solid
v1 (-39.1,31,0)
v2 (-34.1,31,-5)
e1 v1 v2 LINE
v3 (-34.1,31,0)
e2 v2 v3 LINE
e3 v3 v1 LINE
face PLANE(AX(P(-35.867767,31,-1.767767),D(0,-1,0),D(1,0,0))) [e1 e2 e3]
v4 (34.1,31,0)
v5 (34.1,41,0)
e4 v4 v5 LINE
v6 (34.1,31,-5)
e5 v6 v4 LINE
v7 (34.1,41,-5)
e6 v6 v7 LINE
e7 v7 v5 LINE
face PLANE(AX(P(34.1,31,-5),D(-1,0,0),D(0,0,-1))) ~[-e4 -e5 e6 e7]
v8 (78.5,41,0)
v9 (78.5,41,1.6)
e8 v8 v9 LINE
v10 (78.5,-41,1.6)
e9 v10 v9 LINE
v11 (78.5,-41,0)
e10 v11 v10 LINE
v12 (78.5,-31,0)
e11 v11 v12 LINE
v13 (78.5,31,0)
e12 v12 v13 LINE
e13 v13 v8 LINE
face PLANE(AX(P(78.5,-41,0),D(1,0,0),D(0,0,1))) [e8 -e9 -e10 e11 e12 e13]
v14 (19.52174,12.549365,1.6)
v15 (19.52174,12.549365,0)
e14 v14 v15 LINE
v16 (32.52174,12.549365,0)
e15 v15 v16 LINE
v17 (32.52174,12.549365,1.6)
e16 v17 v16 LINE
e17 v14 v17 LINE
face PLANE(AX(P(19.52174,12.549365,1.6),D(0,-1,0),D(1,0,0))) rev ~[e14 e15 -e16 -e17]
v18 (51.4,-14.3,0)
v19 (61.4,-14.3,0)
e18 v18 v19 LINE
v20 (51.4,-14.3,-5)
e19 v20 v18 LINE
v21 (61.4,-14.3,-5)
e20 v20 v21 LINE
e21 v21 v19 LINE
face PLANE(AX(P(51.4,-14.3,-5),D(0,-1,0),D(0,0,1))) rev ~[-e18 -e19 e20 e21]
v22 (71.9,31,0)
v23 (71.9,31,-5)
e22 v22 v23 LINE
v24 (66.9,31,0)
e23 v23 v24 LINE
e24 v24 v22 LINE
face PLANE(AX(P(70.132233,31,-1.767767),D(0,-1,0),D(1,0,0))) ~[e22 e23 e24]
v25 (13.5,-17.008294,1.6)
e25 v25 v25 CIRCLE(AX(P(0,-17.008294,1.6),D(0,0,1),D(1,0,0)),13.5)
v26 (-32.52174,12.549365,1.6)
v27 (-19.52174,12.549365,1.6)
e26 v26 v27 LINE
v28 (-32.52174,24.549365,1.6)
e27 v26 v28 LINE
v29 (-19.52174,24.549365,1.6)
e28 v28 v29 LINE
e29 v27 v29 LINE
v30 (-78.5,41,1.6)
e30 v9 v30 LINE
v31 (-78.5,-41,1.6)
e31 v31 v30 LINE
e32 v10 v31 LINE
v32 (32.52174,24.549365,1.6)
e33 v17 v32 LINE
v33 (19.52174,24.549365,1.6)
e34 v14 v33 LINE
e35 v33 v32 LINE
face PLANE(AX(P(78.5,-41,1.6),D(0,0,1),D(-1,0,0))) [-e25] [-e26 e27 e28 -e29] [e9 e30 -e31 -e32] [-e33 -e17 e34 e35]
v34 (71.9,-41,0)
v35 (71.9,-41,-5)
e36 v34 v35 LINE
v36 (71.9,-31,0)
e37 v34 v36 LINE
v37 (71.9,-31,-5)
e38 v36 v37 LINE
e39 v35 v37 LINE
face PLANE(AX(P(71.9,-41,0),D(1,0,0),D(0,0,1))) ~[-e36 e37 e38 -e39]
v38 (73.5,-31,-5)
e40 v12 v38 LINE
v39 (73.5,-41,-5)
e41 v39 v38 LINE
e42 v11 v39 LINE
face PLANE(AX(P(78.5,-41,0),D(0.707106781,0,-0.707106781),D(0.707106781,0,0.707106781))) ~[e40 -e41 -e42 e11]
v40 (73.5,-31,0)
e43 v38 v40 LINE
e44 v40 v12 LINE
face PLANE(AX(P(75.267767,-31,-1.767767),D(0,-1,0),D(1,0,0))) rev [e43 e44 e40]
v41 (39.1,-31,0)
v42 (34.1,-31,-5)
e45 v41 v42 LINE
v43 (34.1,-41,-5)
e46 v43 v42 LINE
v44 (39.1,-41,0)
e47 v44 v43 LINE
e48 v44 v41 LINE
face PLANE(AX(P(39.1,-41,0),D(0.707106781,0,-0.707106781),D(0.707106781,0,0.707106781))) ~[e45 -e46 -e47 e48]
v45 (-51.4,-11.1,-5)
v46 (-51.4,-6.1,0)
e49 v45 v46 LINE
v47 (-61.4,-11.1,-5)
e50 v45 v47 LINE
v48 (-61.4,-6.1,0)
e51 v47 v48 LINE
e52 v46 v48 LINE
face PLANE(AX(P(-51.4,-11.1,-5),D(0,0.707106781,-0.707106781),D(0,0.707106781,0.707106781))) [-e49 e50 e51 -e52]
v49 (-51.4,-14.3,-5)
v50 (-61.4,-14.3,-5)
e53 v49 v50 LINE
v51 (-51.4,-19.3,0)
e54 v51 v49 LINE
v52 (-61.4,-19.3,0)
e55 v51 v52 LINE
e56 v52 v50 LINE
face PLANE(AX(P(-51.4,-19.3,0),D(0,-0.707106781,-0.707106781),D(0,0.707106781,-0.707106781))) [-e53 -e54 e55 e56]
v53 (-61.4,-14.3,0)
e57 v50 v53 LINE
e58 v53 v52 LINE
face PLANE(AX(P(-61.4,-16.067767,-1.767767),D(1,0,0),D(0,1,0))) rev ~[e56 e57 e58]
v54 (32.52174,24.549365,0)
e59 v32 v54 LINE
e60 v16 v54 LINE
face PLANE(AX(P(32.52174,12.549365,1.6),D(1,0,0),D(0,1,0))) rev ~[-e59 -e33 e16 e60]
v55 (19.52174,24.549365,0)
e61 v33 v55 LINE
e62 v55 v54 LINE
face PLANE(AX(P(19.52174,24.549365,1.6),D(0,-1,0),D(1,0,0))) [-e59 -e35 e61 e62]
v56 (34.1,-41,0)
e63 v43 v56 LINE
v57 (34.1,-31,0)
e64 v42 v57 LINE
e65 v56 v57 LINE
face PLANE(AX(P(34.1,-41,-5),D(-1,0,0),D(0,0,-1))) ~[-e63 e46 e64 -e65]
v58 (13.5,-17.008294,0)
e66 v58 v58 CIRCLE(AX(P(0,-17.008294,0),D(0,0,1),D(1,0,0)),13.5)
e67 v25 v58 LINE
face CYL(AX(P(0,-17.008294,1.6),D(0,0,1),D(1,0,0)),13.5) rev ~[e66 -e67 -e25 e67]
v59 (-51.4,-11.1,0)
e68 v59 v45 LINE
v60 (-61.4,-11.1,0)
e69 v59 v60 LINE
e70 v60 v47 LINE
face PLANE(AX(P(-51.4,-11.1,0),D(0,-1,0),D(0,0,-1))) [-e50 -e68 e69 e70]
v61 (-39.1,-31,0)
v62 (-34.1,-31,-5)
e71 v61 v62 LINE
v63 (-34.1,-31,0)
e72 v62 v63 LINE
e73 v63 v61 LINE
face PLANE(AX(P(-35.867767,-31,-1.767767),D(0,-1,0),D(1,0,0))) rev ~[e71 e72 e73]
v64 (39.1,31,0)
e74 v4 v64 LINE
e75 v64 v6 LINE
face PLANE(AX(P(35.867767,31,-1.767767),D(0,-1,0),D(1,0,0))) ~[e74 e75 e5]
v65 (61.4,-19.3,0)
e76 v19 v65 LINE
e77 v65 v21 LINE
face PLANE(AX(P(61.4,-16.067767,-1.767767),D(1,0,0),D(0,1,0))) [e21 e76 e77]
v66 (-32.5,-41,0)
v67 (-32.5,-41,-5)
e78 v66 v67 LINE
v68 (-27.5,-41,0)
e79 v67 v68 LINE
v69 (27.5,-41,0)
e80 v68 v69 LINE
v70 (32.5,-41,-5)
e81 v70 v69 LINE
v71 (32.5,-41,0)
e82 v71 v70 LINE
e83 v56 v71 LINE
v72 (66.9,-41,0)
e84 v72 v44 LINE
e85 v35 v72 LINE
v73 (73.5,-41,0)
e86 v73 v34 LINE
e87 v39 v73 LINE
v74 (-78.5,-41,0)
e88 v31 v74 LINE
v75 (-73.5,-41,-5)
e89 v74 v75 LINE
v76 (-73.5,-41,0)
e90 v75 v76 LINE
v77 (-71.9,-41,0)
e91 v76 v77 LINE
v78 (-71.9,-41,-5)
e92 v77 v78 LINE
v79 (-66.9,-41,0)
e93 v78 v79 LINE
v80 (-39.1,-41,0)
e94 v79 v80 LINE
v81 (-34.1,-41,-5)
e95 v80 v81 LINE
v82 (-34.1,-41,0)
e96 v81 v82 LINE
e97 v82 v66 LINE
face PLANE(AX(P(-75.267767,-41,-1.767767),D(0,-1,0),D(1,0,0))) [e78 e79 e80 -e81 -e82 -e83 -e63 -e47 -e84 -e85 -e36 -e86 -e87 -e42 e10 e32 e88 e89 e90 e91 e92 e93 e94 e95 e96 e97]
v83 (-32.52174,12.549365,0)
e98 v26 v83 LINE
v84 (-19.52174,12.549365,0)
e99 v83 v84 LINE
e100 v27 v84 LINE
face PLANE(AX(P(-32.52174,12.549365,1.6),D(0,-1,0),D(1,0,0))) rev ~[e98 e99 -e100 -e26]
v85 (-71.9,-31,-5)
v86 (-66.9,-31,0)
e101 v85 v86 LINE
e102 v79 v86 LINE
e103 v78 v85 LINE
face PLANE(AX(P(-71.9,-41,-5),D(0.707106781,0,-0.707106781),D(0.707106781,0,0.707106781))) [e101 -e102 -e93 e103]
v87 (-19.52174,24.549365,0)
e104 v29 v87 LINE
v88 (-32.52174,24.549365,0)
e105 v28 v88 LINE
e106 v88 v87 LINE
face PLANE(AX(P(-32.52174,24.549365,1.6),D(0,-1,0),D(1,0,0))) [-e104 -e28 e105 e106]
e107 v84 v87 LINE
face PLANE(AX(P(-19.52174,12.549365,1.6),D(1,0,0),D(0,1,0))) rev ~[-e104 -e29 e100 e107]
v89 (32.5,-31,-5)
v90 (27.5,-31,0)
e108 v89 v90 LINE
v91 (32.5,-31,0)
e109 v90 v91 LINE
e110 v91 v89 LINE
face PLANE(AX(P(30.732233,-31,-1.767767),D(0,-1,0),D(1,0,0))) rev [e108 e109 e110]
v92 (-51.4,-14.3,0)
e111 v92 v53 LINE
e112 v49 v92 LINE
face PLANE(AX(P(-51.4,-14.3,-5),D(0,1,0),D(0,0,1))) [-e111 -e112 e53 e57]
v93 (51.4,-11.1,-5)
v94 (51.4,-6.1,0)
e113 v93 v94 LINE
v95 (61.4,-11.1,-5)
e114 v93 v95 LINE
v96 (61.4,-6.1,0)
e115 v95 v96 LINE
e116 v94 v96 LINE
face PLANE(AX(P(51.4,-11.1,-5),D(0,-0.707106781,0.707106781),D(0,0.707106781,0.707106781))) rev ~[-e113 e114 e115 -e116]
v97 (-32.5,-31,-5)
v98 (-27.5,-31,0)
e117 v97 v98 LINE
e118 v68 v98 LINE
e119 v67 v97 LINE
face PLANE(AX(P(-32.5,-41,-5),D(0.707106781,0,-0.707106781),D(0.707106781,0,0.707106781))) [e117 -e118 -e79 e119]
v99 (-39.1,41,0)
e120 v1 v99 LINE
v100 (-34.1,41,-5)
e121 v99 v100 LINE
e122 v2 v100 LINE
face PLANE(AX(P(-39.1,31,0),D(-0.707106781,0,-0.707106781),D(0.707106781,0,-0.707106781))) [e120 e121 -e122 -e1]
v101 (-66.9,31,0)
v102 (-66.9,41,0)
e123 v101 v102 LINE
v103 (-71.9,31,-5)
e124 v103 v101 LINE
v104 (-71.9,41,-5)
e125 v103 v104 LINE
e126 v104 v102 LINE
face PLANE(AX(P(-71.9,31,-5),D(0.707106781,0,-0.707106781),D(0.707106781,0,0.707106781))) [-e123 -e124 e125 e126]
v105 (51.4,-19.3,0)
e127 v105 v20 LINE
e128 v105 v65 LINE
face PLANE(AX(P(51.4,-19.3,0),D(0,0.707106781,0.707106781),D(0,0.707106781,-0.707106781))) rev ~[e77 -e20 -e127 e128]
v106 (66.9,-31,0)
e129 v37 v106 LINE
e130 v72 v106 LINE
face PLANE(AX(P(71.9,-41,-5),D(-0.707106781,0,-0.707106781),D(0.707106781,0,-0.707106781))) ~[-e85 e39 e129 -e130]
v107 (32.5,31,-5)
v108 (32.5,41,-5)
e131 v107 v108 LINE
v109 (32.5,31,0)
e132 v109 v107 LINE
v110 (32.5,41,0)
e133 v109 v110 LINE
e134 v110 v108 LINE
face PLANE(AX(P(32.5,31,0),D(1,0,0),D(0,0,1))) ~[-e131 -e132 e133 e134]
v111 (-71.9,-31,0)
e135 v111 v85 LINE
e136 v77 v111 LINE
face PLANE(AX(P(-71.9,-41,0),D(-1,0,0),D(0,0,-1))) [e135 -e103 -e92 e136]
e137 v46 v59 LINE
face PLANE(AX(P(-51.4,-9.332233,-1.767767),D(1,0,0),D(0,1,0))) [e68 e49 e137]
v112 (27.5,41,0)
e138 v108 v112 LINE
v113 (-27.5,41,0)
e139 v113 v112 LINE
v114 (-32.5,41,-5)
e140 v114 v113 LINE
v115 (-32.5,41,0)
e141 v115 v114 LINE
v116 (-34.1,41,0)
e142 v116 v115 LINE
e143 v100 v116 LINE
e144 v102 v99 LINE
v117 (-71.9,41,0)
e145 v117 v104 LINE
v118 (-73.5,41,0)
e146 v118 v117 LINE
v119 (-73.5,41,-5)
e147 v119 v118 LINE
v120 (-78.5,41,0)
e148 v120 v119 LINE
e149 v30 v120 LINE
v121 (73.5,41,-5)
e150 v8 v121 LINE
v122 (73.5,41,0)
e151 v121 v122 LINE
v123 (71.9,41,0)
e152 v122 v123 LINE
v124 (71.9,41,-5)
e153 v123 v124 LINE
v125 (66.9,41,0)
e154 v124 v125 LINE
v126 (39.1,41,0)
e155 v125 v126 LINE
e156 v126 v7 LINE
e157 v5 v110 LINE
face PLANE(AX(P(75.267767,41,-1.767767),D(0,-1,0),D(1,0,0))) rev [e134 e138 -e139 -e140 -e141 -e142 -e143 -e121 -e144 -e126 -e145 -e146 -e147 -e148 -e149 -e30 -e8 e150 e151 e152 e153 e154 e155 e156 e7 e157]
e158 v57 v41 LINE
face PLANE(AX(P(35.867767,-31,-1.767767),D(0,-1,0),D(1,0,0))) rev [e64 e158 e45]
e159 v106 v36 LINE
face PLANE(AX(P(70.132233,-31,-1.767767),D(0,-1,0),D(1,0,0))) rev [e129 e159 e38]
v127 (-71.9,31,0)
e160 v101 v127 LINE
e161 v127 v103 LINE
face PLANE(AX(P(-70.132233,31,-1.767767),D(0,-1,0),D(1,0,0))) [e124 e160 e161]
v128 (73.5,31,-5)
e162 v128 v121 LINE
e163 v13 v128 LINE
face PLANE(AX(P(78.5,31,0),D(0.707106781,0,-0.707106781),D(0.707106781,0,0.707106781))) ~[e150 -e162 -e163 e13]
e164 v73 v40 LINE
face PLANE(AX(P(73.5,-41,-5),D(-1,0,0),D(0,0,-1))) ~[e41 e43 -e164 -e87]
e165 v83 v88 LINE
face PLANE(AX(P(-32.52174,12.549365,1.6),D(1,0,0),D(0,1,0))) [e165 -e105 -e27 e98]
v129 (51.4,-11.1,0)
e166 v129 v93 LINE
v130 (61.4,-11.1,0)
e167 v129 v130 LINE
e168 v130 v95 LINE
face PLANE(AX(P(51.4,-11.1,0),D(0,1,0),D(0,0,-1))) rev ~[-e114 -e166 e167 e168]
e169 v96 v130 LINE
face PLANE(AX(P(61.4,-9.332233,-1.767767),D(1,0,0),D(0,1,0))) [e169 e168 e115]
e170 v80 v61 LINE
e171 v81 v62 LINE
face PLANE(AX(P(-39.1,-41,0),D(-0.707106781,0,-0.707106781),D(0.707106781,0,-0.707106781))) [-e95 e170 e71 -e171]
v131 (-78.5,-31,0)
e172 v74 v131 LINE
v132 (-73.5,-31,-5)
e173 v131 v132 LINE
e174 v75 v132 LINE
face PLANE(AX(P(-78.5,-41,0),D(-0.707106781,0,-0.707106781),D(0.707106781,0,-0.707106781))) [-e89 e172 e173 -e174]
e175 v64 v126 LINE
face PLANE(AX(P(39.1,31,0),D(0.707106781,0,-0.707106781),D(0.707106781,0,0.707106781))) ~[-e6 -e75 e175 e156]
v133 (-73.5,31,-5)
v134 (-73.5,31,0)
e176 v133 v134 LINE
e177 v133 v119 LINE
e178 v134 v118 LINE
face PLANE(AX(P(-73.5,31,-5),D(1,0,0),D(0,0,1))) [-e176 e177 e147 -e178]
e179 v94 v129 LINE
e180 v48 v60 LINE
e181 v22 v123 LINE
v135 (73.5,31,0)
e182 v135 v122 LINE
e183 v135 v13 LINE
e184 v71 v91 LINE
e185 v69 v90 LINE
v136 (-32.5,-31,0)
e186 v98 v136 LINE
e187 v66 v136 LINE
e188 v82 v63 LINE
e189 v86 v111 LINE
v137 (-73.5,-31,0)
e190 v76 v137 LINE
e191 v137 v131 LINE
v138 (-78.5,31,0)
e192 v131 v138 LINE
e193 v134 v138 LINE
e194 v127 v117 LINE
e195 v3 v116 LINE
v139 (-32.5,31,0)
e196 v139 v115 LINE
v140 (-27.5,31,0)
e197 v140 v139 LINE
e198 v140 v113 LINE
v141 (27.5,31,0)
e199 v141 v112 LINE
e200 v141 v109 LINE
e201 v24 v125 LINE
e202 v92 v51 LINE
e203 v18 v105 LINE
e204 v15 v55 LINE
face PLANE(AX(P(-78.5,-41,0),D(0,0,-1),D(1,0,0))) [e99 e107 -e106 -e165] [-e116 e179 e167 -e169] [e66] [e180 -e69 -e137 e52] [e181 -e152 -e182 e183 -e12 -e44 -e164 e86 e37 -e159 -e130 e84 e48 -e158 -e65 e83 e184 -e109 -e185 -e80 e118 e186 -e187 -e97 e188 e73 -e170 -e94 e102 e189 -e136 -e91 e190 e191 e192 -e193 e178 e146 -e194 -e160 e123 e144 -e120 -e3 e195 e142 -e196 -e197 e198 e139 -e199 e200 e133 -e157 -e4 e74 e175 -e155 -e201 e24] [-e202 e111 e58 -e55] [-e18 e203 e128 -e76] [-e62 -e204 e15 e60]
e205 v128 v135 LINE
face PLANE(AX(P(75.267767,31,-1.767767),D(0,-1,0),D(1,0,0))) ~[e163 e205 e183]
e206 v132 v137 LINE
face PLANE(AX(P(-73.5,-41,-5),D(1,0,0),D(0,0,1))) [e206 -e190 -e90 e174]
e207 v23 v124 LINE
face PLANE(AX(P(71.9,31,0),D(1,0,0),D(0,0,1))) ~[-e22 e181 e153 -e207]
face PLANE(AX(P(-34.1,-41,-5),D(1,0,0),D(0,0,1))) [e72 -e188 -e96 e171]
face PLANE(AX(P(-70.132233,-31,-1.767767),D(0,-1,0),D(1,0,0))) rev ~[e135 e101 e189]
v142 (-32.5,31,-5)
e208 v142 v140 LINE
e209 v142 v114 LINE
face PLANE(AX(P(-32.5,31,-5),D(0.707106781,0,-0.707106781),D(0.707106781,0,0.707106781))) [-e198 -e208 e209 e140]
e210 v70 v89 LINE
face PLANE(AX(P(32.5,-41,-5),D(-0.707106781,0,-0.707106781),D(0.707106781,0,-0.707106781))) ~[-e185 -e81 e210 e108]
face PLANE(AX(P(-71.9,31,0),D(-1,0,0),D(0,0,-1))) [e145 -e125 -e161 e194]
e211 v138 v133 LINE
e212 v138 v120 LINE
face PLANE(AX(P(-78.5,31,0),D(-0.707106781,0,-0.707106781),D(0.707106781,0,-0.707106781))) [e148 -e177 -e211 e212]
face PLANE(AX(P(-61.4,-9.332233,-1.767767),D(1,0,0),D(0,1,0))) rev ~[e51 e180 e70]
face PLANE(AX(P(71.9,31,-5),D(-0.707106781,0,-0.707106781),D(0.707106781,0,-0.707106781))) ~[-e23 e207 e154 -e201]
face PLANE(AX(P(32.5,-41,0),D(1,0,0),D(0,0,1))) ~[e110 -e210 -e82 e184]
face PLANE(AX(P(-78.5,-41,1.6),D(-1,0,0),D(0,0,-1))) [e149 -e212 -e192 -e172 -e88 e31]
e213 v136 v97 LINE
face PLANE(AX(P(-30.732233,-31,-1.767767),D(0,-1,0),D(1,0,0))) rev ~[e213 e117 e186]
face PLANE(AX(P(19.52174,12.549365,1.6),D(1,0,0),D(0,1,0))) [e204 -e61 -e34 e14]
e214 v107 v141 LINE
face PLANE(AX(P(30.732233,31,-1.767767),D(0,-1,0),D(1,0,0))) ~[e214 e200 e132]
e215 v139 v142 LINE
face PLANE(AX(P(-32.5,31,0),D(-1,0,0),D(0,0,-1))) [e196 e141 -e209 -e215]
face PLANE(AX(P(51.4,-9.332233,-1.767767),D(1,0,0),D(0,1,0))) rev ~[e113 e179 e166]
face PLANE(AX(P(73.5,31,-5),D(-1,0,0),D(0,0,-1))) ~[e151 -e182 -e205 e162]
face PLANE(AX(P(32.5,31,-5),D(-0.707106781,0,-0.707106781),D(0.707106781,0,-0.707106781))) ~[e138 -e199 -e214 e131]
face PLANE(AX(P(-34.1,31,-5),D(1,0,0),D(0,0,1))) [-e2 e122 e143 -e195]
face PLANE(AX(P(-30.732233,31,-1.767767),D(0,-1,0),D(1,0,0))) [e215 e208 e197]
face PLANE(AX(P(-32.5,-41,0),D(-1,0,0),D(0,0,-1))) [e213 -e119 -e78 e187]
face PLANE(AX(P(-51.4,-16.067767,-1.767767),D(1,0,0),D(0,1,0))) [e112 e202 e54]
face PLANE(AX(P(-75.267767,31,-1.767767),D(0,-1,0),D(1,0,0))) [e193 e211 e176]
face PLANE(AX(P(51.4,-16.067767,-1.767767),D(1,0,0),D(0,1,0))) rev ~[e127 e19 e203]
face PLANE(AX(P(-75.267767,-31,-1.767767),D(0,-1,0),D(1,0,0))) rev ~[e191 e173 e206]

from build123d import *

# Parameters (mm, degrees)
F2_DEPTH  = 82
F3_DEPTH  = 10
F4_START  = -72
F4_DEPTH  = 10
F7_DEPTH  = 10
F8_START  = 102.8
F8_DEPTH  = 10
F10_R     = 13.5
F11_DEPTH = 1.6
F12_W     = 13
F12_H     = 12
F13_DEPTH = 1.6


# Not quite as in the source:
# - a feature names something its author has since deleted; it is built from what else it names


with BuildPart() as f2:
    # F1 (on offset) → F2 (new body)
    with BuildSketch(Plane.XZ.offset(41)):
        Polygon((78.5, 0), (78.5, 1.6), (-78.5, 1.6), (-78.5, 0), (-73.5, 0), (-71.9, 0), (-66.9, 0), (-39.1, 0), (-34.1, 0), (-32.5, 0), (-27.5, 0), (27.5, 0), (32.5, 0), (34.1, 0), (39.1, 0), (66.9, 0), (71.9, 0), (73.5, 0), align=None)
    extrude(amount=-F2_DEPTH)

    # F1 (on offset) → F3 (join)
    with BuildSketch(Plane.XZ.offset(41)):
        Polygon((-66.9, 0), (-71.9, 0), (-71.9, -5), align=None)
        Polygon((-34.1, 0), (-39.1, 0), (-34.1, -5), align=None)
        Polygon((-27.5, 0), (-32.5, 0), (-32.5, -5), align=None)
        Polygon((-73.5, 0), (-78.5, 0), (-73.5, -5), align=None)
    extrude(amount=-F3_DEPTH)

    # F1 (on offset) → F4 (join)
    with BuildSketch(Plane.XZ.offset(41).offset(F4_START)):
        Polygon((-66.9, 0), (-71.9, 0), (-71.9, -5), align=None)
        Polygon((-34.1, 0), (-39.1, 0), (-34.1, -5), align=None)
        Polygon((-27.5, 0), (-32.5, 0), (-32.5, -5), align=None)
        Polygon((-73.5, 0), (-78.5, 0), (-73.5, -5), align=None)
    extrude(amount=-F4_DEPTH)

    # F6 (on offset) → F7 (join)
    with BuildSketch(Plane.YZ.offset(-51.4)):
        Polygon((-11.1, 0), (-11.1, -5), (-6.1, 0), align=None)
        Polygon((-14.3, -5), (-14.3, 0), (-19.3, 0), align=None)
    extrude(amount=-F7_DEPTH)

    # F6 (on offset) → F8 (join)
    with BuildSketch(Plane.YZ.offset(-51.4).offset(F8_START)):
        Polygon((-11.1, 0), (-11.1, -5), (-6.1, 0), align=None)
        Polygon((-14.3, -5), (-14.3, 0), (-19.3, 0), align=None)
    extrude(amount=F8_DEPTH)

    # F9: F2 across plane


with BuildPart() as f2_1:
    add(f2.part)
    add(f2.part.mirror(Plane.YZ))

    # F10 (on face) → F11 (cut)
    with BuildSketch(Plane.XY.offset(1.6)):
        with Locations((0, -17.0082943066)):
            Circle(F10_R)
    extrude(amount=-F11_DEPTH, mode=Mode.SUBTRACT)

    # F12 (on face) → F13 (cut)
    with BuildSketch(Plane.XY.offset(1.6)):
        with Locations((-26.0217403993, 18.549364836)):
            Rectangle(F12_W, F12_H)
        with Locations((26.0217403993, 18.549364836)):
            Rectangle(F12_W, F12_H)
    extrude(amount=-F13_DEPTH, mode=Mode.SUBTRACT)


solid = f2_1.part
